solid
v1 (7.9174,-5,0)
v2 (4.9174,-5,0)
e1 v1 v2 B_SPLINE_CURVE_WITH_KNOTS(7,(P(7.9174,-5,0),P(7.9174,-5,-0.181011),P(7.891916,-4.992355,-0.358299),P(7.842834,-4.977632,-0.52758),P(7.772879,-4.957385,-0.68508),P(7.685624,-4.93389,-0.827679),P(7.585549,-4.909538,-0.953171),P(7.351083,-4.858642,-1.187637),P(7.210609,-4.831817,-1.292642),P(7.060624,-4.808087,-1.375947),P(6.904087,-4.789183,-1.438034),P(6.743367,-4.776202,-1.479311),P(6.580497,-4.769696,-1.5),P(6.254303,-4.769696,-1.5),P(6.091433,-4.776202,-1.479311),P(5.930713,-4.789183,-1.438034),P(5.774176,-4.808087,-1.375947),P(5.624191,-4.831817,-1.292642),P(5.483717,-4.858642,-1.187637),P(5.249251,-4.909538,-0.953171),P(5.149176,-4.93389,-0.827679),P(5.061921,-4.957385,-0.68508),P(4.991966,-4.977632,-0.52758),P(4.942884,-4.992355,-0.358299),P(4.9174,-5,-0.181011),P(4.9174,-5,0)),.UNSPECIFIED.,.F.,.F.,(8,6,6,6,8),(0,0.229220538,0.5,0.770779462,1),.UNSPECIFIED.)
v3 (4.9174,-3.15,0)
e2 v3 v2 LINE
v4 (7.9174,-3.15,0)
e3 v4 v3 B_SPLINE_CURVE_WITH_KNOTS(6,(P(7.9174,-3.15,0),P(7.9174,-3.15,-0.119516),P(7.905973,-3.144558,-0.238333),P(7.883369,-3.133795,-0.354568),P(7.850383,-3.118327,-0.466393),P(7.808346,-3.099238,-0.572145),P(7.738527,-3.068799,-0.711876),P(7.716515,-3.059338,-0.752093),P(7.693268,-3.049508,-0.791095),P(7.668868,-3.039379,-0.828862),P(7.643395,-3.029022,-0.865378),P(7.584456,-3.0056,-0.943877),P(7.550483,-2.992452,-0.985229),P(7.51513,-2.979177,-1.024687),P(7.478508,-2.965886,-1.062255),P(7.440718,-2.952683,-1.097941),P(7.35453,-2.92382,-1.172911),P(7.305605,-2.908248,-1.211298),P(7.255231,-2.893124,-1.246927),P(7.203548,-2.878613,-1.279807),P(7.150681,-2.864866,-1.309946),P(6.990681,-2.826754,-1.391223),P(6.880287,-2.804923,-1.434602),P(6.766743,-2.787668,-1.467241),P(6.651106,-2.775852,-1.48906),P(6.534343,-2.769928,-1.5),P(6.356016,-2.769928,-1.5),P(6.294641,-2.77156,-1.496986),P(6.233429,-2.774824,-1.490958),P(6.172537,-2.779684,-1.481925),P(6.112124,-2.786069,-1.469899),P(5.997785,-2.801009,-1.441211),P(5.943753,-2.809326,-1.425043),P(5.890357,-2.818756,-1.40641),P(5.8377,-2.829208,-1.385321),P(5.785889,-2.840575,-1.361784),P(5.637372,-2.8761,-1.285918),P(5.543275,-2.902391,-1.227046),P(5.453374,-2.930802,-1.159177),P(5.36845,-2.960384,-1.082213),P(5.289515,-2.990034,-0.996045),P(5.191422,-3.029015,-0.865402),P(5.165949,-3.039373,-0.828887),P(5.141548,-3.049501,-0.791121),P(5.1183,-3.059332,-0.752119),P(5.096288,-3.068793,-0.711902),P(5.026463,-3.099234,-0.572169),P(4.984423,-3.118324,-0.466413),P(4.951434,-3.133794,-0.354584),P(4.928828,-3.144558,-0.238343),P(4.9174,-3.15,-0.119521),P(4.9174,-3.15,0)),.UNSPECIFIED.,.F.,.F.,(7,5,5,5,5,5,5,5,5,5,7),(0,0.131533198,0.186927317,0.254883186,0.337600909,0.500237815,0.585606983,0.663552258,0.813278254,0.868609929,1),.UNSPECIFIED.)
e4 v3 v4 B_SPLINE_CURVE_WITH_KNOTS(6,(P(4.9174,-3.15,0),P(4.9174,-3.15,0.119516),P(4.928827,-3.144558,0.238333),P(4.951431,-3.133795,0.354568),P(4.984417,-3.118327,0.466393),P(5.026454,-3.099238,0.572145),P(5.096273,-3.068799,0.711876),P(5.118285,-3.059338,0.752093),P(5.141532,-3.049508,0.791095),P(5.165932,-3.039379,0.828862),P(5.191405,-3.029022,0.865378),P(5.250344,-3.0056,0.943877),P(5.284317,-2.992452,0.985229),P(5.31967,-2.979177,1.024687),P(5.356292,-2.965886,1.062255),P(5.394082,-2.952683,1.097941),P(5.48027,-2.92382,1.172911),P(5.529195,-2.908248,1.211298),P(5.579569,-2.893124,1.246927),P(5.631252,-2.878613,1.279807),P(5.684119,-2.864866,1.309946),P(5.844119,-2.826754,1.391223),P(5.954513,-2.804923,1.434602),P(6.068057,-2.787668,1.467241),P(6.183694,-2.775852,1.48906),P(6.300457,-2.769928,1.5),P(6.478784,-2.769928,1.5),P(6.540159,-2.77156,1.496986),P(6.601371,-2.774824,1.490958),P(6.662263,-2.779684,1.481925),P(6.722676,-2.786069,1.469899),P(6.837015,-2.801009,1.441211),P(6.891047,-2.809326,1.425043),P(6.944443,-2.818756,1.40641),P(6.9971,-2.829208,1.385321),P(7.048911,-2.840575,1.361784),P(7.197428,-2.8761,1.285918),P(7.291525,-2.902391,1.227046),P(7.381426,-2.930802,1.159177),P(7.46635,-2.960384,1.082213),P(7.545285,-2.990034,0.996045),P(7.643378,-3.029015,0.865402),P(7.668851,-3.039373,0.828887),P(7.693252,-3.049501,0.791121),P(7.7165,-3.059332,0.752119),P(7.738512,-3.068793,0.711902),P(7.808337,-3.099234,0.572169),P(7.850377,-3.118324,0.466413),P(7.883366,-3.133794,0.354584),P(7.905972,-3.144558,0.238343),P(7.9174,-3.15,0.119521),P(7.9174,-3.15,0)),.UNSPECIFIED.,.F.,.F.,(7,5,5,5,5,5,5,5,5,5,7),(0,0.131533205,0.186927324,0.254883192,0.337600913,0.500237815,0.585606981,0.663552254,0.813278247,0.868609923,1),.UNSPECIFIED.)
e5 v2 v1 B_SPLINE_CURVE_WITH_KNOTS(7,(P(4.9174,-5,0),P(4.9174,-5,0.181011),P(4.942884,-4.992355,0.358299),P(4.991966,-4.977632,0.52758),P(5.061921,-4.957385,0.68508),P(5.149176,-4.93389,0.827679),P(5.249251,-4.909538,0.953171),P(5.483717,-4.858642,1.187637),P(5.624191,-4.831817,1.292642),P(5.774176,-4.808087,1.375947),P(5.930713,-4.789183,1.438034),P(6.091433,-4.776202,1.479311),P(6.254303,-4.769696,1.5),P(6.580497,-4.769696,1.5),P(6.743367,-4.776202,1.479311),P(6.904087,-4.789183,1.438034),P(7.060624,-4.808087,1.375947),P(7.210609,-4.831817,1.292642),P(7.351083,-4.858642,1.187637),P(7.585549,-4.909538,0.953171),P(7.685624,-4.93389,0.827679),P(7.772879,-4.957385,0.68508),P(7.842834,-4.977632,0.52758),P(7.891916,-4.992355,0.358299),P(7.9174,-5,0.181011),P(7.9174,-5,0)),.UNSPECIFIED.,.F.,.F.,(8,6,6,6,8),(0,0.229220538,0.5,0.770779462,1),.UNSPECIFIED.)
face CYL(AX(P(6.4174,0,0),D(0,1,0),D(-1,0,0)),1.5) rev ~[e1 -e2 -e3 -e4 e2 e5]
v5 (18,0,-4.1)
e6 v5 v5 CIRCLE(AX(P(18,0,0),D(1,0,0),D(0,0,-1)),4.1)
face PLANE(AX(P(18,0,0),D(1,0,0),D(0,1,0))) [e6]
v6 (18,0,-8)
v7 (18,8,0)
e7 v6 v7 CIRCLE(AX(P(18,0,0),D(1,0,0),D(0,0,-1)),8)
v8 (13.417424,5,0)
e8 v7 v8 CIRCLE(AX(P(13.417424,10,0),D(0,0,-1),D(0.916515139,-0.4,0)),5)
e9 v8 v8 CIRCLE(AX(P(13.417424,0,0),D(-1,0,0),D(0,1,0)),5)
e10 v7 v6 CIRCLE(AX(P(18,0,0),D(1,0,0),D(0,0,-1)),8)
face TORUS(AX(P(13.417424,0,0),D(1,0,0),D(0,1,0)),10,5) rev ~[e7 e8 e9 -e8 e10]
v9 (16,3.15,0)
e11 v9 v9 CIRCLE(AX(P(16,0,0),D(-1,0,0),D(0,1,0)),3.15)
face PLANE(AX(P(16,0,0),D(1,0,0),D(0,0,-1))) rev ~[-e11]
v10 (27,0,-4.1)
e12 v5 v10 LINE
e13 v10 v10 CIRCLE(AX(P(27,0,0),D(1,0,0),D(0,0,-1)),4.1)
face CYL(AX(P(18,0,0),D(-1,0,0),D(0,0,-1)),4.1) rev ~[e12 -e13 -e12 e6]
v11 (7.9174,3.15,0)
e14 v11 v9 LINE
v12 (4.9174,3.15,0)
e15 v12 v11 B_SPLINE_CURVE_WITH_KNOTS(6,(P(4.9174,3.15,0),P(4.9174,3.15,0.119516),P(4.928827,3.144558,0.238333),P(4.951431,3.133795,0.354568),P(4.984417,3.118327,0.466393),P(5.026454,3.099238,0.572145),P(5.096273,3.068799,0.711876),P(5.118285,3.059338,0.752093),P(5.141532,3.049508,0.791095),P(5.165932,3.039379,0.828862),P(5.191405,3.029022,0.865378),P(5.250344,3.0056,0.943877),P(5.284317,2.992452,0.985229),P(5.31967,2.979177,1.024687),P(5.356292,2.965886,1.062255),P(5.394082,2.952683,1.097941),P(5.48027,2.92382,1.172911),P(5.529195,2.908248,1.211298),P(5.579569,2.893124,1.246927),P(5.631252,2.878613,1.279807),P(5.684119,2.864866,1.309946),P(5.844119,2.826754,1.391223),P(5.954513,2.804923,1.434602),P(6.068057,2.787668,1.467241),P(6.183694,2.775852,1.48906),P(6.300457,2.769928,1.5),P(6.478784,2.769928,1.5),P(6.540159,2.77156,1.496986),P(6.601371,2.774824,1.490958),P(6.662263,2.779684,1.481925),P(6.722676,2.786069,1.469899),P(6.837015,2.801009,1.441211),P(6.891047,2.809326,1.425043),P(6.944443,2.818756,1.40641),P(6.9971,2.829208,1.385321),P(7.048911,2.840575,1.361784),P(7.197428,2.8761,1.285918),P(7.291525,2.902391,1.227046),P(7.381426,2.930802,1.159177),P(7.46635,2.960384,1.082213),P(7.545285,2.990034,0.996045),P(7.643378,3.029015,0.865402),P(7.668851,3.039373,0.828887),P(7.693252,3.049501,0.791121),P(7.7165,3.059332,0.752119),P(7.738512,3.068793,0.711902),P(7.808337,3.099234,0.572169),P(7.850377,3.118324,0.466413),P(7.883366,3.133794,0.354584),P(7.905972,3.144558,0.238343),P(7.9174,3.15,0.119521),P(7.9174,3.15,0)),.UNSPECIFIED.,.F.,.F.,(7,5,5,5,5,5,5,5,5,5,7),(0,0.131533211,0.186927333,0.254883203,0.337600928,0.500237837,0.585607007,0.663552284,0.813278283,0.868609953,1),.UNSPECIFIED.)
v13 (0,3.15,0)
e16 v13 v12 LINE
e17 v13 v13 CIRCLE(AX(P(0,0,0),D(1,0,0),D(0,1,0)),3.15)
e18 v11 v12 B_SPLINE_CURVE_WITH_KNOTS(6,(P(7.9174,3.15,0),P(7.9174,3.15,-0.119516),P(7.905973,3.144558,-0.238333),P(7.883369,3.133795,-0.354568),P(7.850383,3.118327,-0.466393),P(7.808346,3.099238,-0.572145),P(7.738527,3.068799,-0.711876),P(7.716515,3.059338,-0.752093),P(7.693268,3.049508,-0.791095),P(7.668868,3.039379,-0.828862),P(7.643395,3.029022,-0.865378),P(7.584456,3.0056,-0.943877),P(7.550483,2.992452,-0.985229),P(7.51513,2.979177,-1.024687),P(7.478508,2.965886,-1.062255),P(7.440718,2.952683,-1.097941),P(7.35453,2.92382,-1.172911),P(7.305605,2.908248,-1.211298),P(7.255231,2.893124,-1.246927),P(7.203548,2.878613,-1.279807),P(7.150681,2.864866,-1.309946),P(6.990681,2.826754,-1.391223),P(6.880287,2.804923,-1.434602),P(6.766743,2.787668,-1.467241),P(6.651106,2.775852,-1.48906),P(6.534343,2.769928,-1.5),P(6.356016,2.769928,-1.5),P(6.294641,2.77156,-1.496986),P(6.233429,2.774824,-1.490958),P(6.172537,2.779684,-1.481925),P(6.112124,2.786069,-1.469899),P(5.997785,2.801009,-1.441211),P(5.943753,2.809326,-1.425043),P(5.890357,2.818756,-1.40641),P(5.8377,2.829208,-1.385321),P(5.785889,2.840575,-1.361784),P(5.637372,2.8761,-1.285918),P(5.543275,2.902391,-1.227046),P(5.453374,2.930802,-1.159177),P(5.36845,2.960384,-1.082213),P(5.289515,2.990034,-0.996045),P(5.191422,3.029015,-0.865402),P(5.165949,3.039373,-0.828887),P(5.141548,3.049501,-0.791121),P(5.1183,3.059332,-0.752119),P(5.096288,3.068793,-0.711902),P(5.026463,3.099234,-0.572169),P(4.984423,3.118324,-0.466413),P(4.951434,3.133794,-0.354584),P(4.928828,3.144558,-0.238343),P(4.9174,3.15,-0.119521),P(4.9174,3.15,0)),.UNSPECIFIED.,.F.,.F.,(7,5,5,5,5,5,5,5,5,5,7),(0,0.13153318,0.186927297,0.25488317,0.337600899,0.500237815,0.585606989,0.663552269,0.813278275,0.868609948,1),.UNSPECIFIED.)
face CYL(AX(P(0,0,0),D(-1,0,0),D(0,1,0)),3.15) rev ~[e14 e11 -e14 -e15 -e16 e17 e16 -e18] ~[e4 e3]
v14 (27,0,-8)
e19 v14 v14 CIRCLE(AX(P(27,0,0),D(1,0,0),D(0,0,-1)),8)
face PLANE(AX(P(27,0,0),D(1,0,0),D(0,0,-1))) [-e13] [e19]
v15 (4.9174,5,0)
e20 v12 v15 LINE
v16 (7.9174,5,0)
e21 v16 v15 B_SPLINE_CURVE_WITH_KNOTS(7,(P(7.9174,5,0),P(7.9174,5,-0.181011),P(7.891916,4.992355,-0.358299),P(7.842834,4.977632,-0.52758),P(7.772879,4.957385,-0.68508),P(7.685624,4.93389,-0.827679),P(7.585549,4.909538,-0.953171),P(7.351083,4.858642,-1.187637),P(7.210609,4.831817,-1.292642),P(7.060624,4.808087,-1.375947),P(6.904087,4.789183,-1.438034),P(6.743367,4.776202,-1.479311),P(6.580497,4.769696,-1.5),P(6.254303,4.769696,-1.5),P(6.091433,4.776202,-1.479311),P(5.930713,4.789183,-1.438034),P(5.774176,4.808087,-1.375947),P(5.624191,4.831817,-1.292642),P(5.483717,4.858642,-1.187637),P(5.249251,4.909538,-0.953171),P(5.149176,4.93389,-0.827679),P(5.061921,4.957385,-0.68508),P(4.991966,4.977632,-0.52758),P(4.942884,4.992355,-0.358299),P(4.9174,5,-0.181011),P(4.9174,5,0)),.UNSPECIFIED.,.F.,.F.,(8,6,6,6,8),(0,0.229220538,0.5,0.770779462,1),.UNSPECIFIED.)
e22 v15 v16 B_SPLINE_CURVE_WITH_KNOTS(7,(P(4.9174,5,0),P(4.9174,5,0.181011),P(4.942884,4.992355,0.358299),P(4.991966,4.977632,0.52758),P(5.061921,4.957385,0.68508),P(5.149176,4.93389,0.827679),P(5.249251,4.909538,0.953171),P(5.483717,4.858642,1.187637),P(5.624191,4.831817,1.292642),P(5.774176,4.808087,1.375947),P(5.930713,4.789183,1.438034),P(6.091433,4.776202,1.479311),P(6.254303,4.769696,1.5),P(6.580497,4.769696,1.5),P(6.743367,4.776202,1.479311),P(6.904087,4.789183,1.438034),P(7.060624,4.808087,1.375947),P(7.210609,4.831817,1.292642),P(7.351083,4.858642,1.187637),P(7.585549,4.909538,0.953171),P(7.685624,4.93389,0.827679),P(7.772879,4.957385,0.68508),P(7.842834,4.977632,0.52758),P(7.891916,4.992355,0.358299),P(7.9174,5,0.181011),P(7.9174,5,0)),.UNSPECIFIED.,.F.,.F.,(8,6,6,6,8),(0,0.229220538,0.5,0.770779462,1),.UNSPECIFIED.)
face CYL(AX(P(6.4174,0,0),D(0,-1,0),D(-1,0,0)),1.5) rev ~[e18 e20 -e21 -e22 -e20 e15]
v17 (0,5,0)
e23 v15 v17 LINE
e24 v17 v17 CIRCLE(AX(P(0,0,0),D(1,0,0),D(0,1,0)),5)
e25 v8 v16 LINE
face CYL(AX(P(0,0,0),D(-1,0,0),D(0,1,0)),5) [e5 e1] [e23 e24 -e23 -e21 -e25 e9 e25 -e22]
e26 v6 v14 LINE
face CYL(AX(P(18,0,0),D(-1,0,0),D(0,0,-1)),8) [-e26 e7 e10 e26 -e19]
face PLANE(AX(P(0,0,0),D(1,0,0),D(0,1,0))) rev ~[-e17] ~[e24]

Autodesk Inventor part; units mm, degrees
ref_plane "YZ Plane" through (0, 0, 0) normal (1, 0, 0) x (0, 1, 0)
ref_plane "XZ Plane" through (0, 0, 0) normal (0, 1, 0) x (-1, 0, 0)
ref_plane "XY Plane" through (0, 0, 0) normal (0, 0, 1) x (1, 0, 0)
sketch "Sketch1" plane through (0, 0, 0) normal (1, 0, 0) x (0, 1, 0)
  circle A0 centre (0, 0) radius 3.15
  circle A1 centre (0, 0) radius 5
  dimension "d0" = 6.3
  dimension "d1" = 10
extrude "Extrusion1" add sketch "Sketch1" along normal blind 18
sketch "Sketch2" plane through (18, 0, 0) normal (1, 0, 0) x (0, 0, -1)
  circle A0 centre (0, 0) radius 5
  dimension "d4" = 10
extrude "Extrusion2" add sketch "Sketch2" against normal blind 2
sketch "Sketch3" plane through (18, 0, 0) normal (1, 0, 0) x (0, 0, -1)
  circle A0 centre (0, 0) radius 4.1
  circle A1 centre (0, 0) radius 8
  dimension "d7" = 8.2
  dimension "d8" = 16
extrude "Extrusion3" add sketch "Sketch3" along normal blind 9
fillet "Fillet1" radius 5 1 edges at (18, -5, 0)
sketch "Sketch4" plane through (0, 0, 0) normal (0, 1, 0) x (-1, 0, 0)
  line L0 (-13.4174, 5) -> (-13.4174, -5) projected
  line L1 (-13.4174, 0) -> (-6.4174, 0)
  circle A0 centre (-6.4174, 0) radius 1.5
  point P0 (0, 0)
  dimension "d12" = 7
  dimension "d13" = 3
extrude "Extrusion4" cut sketch "Sketch4" along normal mid plane 44
properties part number "coupling_motor_lead_screw"
